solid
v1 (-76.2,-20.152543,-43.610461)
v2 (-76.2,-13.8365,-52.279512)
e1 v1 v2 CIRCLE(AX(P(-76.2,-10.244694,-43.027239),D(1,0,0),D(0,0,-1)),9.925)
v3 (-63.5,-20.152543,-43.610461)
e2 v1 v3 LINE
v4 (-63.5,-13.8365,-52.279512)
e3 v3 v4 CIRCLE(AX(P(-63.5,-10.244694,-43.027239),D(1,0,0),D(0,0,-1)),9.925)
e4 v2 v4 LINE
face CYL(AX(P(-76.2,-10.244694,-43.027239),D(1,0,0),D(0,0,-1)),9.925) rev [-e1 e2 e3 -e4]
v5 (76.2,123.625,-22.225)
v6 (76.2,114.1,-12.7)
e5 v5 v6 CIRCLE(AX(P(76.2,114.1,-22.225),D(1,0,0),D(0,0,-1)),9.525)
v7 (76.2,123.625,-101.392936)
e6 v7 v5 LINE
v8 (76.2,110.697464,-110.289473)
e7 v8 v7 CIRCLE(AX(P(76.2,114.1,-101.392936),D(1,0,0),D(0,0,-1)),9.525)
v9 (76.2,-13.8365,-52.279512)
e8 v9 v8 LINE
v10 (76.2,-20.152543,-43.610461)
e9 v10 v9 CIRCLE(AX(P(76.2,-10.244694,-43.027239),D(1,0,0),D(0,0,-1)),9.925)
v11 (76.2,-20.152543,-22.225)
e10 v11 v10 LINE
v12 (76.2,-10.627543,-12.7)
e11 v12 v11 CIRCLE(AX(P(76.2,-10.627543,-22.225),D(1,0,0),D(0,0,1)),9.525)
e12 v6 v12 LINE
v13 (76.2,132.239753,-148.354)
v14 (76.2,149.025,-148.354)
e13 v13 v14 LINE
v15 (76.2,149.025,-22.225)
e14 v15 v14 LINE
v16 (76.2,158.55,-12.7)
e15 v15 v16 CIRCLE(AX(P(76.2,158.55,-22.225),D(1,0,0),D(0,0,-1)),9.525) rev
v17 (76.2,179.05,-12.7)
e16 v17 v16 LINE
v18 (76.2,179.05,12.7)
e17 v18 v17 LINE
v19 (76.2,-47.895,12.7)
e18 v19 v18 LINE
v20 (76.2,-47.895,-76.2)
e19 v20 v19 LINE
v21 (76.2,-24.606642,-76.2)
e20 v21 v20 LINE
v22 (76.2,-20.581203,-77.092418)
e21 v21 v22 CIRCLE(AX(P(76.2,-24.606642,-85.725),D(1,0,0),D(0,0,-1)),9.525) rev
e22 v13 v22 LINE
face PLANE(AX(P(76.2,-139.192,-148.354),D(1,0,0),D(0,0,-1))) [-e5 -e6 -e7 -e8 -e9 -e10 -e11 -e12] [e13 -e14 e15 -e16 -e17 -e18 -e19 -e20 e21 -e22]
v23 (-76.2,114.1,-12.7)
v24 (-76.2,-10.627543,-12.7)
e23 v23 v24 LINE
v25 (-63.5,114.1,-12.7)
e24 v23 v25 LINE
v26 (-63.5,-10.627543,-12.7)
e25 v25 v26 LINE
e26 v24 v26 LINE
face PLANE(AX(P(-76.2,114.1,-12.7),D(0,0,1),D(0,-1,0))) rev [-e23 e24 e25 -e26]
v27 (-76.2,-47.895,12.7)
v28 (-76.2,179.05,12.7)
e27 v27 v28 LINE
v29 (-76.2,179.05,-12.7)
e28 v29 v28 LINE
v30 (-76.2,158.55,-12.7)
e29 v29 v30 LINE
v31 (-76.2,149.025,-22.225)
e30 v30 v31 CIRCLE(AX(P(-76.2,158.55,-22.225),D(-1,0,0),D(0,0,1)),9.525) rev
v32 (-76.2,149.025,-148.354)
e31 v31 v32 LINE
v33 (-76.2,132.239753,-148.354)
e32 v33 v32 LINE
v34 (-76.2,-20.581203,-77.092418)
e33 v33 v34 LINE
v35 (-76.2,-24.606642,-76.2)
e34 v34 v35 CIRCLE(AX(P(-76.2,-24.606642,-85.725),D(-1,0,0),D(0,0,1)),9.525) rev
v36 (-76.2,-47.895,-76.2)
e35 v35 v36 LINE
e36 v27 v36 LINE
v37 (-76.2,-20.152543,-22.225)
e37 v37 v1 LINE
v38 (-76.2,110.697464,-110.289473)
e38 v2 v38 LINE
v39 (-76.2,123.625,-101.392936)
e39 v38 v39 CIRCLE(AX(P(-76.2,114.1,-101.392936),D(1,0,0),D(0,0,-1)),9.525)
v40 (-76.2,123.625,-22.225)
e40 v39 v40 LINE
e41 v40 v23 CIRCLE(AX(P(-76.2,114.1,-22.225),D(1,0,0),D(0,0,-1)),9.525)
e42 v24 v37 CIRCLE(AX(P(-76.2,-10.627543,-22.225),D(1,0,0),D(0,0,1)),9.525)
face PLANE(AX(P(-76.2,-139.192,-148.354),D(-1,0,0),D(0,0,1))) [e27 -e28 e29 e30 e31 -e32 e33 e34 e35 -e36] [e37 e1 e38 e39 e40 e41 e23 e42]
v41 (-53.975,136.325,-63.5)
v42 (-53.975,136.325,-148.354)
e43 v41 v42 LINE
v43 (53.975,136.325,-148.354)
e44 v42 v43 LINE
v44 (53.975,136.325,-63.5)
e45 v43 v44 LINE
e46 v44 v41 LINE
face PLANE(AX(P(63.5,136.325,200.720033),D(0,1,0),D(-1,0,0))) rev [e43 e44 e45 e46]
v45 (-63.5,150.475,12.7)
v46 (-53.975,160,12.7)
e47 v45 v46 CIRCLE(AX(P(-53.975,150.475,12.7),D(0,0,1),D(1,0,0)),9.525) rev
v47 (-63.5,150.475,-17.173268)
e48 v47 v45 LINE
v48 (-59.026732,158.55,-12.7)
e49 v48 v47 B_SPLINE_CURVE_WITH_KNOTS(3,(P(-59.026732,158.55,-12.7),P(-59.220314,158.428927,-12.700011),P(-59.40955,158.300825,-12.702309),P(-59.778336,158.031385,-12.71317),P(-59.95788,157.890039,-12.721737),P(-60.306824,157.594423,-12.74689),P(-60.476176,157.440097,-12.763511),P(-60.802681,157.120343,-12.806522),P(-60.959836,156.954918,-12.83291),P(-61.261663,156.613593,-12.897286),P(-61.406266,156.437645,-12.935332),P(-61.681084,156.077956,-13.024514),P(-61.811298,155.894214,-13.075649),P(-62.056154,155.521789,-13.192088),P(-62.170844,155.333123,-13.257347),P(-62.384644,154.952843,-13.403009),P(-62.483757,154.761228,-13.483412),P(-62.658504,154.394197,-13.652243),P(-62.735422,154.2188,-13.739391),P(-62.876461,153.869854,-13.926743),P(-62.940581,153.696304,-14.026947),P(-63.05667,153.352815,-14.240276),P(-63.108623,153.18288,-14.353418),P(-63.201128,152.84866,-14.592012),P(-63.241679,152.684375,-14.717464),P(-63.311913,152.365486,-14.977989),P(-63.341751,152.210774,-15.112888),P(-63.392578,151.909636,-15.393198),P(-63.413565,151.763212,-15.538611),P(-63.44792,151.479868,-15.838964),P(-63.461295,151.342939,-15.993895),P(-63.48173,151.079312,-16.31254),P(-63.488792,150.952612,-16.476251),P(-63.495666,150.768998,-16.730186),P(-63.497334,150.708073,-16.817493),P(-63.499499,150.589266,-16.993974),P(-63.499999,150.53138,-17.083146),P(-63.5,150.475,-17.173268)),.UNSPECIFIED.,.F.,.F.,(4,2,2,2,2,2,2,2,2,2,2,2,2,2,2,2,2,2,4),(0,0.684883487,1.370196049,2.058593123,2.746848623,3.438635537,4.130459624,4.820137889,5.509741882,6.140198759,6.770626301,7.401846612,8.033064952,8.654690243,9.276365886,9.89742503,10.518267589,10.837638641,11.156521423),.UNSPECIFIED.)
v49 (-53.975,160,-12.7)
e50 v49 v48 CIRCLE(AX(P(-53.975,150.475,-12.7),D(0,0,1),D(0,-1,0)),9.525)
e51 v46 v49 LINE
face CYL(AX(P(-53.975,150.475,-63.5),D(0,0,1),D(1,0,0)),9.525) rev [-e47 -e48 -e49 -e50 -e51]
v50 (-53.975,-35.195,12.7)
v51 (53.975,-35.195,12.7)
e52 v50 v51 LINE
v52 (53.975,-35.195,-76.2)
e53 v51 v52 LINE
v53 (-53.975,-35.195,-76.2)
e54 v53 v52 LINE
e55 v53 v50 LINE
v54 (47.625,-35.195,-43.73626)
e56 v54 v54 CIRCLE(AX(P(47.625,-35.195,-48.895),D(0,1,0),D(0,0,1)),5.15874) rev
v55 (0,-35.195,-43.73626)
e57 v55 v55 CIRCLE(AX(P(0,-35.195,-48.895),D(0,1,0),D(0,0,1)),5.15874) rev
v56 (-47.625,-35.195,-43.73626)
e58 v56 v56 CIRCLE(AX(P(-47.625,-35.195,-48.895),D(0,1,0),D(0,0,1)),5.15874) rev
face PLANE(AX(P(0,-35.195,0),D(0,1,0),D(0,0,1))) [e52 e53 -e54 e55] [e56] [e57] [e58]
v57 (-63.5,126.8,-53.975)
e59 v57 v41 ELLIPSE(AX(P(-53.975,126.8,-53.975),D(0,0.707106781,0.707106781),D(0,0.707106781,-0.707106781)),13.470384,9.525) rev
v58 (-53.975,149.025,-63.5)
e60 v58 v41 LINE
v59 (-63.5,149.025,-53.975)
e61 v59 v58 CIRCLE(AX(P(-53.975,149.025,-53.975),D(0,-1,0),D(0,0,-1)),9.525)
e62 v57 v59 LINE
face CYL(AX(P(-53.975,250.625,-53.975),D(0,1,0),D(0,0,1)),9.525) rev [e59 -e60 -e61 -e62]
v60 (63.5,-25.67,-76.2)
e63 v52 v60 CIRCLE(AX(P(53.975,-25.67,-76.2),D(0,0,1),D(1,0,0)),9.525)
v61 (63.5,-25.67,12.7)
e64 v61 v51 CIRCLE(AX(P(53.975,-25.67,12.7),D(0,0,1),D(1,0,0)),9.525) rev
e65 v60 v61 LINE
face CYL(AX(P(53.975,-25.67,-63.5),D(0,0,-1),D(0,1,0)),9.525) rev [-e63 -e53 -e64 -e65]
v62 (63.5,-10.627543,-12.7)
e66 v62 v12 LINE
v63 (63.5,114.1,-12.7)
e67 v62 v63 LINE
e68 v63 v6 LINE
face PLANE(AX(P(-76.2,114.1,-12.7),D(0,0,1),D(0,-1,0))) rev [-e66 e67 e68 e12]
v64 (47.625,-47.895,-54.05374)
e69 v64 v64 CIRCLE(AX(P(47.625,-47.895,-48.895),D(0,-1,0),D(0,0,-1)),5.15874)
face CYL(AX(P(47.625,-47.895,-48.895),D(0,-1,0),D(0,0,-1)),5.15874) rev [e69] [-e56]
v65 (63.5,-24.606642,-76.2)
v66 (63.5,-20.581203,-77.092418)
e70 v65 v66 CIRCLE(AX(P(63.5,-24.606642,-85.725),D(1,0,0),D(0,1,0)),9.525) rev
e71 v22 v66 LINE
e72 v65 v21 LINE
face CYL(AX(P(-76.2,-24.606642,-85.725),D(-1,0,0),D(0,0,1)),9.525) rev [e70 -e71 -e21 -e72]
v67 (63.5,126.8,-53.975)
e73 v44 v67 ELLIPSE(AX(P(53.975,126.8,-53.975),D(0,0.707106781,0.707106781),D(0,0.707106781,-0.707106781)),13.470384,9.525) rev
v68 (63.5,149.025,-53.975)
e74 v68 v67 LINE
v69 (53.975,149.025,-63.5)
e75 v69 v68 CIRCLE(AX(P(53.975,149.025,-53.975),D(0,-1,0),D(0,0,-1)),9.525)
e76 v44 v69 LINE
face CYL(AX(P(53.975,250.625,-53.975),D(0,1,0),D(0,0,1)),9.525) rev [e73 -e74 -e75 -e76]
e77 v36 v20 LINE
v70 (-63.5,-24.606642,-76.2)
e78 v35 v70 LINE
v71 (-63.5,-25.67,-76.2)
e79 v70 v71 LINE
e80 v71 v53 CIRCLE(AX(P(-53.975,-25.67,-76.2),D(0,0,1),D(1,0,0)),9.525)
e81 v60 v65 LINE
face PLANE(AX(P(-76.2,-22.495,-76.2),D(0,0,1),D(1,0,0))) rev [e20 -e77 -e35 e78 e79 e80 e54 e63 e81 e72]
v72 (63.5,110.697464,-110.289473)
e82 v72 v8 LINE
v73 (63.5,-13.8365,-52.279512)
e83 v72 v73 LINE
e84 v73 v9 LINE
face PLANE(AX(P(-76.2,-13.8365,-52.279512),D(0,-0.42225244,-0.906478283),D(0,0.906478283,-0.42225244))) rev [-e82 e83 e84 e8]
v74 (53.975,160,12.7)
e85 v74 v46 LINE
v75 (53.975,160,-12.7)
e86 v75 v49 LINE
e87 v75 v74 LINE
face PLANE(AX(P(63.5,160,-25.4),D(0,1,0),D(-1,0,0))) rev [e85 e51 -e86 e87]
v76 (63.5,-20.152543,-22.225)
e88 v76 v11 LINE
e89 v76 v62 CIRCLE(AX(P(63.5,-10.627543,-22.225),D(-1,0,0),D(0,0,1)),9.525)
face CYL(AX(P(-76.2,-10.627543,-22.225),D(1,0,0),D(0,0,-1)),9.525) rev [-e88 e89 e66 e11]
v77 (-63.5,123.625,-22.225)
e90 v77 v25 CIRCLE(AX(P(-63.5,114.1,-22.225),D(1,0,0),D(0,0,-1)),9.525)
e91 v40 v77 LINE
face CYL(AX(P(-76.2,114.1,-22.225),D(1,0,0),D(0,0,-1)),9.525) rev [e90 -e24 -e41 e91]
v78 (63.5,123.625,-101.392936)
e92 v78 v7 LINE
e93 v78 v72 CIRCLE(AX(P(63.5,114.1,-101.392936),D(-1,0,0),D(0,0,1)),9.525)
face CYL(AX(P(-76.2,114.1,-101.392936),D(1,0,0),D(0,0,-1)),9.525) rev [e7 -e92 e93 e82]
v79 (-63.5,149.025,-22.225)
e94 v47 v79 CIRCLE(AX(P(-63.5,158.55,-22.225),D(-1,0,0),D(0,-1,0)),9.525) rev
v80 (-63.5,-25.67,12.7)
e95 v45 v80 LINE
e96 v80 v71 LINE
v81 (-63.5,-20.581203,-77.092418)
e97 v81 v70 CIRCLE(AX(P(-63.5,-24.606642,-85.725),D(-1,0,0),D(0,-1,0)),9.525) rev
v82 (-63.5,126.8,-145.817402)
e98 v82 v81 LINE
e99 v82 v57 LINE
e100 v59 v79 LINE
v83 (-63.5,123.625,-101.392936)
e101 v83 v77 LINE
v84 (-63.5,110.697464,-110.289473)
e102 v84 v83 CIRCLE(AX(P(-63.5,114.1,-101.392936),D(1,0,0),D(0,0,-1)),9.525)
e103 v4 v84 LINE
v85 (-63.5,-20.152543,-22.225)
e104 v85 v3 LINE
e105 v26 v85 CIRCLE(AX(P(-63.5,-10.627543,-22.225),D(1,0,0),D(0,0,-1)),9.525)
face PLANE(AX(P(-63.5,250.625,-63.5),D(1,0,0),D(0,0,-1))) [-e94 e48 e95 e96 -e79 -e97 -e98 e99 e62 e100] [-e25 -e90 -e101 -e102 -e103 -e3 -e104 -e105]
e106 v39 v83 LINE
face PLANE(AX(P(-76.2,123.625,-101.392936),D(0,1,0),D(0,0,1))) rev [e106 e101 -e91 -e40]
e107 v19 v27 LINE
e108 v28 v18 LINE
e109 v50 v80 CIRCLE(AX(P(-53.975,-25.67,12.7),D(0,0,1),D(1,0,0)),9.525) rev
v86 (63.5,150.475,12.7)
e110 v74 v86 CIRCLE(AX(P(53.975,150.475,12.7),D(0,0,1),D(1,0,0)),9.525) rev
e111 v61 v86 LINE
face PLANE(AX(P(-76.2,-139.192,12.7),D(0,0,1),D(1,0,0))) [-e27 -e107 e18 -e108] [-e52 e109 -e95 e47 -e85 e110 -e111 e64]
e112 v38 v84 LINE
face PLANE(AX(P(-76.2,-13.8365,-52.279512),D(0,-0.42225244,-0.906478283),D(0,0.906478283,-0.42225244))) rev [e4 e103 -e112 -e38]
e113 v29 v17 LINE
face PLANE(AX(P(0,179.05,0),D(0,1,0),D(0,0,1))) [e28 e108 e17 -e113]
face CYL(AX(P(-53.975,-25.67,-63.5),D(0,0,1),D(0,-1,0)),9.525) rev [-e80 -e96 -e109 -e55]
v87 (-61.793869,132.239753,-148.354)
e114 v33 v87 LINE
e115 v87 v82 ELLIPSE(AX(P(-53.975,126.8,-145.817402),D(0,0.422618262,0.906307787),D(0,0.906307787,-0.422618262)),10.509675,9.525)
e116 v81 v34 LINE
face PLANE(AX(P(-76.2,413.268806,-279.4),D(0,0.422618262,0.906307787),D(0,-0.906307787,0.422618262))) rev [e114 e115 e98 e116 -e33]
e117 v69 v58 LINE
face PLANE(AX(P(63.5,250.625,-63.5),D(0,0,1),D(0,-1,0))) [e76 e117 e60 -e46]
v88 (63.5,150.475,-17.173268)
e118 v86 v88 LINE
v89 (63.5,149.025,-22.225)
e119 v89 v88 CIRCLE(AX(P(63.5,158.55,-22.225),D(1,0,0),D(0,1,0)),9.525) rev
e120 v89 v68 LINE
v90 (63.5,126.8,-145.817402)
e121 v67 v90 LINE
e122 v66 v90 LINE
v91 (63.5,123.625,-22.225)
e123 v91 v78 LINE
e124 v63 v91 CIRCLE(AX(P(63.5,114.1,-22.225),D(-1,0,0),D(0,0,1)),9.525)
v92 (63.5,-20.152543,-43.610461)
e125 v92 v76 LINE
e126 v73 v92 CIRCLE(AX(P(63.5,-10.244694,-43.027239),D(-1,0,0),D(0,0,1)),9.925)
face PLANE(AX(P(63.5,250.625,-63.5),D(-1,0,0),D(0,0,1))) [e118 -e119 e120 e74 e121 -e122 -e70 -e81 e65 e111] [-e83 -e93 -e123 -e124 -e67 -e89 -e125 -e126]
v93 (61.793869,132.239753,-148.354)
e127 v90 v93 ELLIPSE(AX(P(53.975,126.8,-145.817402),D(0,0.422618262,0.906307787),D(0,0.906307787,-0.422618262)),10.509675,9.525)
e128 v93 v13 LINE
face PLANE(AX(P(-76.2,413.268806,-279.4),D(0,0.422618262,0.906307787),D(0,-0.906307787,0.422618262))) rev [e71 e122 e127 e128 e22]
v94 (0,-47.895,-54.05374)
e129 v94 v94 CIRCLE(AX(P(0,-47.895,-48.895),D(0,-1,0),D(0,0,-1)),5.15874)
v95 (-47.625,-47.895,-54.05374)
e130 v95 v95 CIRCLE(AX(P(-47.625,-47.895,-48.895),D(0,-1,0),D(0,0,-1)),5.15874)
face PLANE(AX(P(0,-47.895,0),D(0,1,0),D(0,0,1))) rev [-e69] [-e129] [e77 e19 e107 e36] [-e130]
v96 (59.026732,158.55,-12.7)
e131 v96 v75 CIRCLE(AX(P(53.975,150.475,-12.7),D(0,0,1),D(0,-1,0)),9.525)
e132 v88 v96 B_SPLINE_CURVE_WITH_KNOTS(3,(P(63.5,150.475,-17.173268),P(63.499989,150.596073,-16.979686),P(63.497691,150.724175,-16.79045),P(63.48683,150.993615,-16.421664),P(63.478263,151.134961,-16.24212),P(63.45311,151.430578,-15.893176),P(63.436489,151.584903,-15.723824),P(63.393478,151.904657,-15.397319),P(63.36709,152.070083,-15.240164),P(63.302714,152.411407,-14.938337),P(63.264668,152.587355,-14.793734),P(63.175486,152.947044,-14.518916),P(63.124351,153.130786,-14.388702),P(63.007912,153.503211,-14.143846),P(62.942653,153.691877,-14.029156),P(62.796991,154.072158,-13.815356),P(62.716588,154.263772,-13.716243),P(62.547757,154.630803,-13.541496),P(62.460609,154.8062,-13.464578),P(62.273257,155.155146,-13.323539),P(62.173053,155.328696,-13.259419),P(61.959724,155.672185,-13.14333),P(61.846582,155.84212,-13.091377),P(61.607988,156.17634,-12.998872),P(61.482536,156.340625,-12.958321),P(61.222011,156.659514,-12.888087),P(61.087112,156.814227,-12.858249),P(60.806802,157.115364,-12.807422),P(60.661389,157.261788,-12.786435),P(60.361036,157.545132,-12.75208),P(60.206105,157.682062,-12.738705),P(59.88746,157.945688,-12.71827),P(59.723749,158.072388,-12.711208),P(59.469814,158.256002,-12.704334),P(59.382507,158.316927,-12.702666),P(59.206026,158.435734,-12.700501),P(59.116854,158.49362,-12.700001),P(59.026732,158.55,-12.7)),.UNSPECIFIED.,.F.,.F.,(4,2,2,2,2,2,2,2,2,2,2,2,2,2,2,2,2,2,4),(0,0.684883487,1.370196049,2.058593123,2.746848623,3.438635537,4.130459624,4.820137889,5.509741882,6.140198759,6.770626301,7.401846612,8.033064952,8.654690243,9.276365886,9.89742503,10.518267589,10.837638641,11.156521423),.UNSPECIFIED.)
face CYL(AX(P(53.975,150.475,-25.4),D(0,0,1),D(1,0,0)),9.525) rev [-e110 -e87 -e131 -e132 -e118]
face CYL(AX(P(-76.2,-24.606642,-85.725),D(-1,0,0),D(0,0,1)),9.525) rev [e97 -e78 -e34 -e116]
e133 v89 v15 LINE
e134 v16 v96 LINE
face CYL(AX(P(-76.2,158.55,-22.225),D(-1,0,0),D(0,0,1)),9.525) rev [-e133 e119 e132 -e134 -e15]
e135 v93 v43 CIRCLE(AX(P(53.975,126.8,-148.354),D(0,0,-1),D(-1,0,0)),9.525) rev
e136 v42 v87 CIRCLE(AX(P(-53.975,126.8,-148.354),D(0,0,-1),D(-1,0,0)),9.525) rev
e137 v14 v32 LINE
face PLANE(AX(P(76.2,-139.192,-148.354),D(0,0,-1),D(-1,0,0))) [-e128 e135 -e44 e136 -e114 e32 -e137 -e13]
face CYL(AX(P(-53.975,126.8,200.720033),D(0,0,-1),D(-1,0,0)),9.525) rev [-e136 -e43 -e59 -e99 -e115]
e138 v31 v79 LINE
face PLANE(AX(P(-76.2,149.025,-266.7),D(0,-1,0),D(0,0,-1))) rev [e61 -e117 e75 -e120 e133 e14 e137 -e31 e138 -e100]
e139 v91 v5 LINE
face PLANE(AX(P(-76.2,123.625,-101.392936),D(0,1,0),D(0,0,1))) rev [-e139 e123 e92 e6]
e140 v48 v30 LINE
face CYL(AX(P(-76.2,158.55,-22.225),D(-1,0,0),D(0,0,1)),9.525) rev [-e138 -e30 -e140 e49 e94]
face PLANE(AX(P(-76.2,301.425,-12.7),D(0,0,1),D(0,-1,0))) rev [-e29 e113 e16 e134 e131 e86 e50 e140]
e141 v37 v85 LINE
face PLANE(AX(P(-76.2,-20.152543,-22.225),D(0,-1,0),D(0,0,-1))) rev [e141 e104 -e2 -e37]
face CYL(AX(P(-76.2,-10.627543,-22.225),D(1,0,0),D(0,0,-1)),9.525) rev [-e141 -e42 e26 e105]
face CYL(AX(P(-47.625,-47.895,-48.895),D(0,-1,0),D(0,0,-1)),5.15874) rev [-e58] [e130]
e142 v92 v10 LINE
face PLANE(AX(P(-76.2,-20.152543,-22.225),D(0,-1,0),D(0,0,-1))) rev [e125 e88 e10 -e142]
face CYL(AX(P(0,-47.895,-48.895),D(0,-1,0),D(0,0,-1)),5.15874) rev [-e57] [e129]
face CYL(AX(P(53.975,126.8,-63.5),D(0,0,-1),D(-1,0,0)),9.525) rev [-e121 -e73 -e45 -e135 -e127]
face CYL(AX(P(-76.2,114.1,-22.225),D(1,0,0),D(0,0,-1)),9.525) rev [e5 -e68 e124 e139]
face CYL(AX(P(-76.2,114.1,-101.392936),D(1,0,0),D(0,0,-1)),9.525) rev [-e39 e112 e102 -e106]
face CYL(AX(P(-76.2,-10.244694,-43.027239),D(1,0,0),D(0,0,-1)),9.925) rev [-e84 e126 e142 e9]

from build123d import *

# Parameters (mm, degrees)
BOSS_EXTRUDE1_DEPTH             = 179.04999999999998
BOSS_EXTRUDE1_DEPTH_BACK        = 139.19200000000004
BOSS_EXTRUDE2_REACH             = 246.692
BOSS_EXTRUDE2_DIRECTION_2_REACH = 246.692
F_3_8_CLEARANCE_HOLE1_D         = 10.31748
CUT_EXTRUDE1_DEPTH              = 245.69215738419686
CUT_EXTRUDE1_DEPTH_BACK         = 245.69215738419686
FILLET1_R                       = 9.525
CUT_EXTRUDE2_DEPTH              = 101.6
CUT_EXTRUDE2_DEPTH_BACK         = 184.22
FILLET2_START                   = -36
FILLET2_DEPTH                   = 185.025000106
FILLET2_START_2                 = -63.5
FILLET2_2_DEPTH                 = 9.525
FILLET2_START_3                 = 53.975
FILLET2_3_DEPTH                 = 9.525
FILLET2_START_4                 = 149.025000106
FILLET2_4_DEPTH                 = 9.525
FILLET2_5_DEPTH                 = 185.025000106
CUT_EXTRUDE3_DEPTH              = 245.69215738419686
CUT_EXTRUDE3_DEPTH_BACK         = 245.69215738419686
FILLET3_R                       = 9.525
CUT_EXTRUDE4_REACH              = 254.594
CUT_EXTRUDE5_DEPTH              = 245.6921573841969
CUT_EXTRUDE5_DEPTH_BACK         = 25.4
FILLET5_R                       = 9.525
CUT_EXTRUDE6_DEPTH              = 245.6921574759669
CUT_EXTRUDE6_DEPTH_BACK         = 245.6921574759669


with BuildPart() as part:
    # Sketch1 → Boss-Extrude1 (new, two sides: drawn at the far end of the back side and taken through both)
    with BuildSketch(Plane(origin=(0, 0, 0), x_dir=(1, 0, 0), z_dir=(0, 1, 0)).offset(-BOSS_EXTRUDE1_DEPTH_BACK)):
        Polygon((-76.20000000000003, 148.35400023367268), (-76.2000000000001, -12.7), (76.2, -12.7), (76.19999999999997, 148.35400023367268), align=None)
    extrude(amount=BOSS_EXTRUDE1_DEPTH + BOSS_EXTRUDE1_DEPTH_BACK)

    # SurfaceCut1
    split(bisect_by=Plane(origin=(-4.831e-14, -47.89499999999913, 0), x_dir=(1, -6e-17, 0), z_dir=(6e-17, 1, -1.73e-15)), keep=Keep.TOP)

    # Boss-Extrude2: up to this face of the body (flat: up to its plane)
    boss_extrude2_end = Plane(part.part.faces().sort_by_distance((76.2, 65.5775, -67.827000117))[0])
    # Sketch3 → Boss-Extrude2 (add, up to the picked face)
    with BuildSketch(Plane(origin=(0, 0, 0), x_dir=(0, 0, -1), z_dir=(1, 0, 0)), mode=Mode.PRIVATE) as boss_extrude2_sk1:
        Polygon((1.2e-16, -38.36999999999911), (75, -38.36999999999911), (75, -47.89499999999911), (1.29e-15, -47.89499999999911), align=None)
    boss_extrude2_tool1 = split(extrude(boss_extrude2_sk1.sketch, amount=BOSS_EXTRUDE2_REACH, mode=Mode.PRIVATE), bisect_by=boss_extrude2_end, keep=Keep.BOTH, mode=Mode.PRIVATE)
    add(boss_extrude2_tool1.solids().sort_by(Axis((0, -43.1325, -37.5), (1, 0, 0)))[0])

    # Boss-Extrude2 direction 2: up to this face of the body (flat: up to its plane)
    boss_extrude2_direction_2_end = Plane(part.part.faces().sort_by_distance((-76.2, 65.5775, -67.827000117))[0])
    # Sketch3 → Boss-Extrude2 direction 2 (add, up to the picked face)
    with BuildSketch(Plane(origin=(0, 0, 0), x_dir=(0, 0, -1), z_dir=(1, 0, 0)), mode=Mode.PRIVATE) as boss_extrude2_direction_2_sk1:
        Polygon((1.2e-16, -38.36999999999911), (75, -38.36999999999911), (75, -47.89499999999911), (1.29e-15, -47.89499999999911), align=None)
    boss_extrude2_direction_2_tool1 = split(extrude(boss_extrude2_direction_2_sk1.sketch, amount=-BOSS_EXTRUDE2_DIRECTION_2_REACH, mode=Mode.PRIVATE), bisect_by=boss_extrude2_direction_2_end, keep=Keep.BOTH, mode=Mode.PRIVATE)
    add(boss_extrude2_direction_2_tool1.solids().sort_by(Axis((0, -43.1325, -37.5), (-1, 0, 0)))[0])

    # 3/8 Clearance Hole1 (through all)
    with Locations(Plane.XZ.offset(47.89499999999913)):
        with Locations((47.625, -48.895), (-47.625, -48.895), (0, -48.895)):
            Hole(F_3_8_CLEARANCE_HOLE1_D / 2)

    # Sketch8 → Cut-Extrude1 (cut, two sides: drawn at the far end of the back side and taken through both)
    with BuildSketch(Plane(origin=(0, 0, 0), x_dir=(0, 0, -1), z_dir=(1, 0, 0)).offset(-CUT_EXTRUDE1_DEPTH_BACK)):
        Polygon((266.69999999999993, 301.4250001060008), (12.699999999999932, 301.42500010600077), (12.699999999999935, 149.02500010600082), (266.69999999999993, 149.02500010600085), align=None)
    extrude(amount=CUT_EXTRUDE1_DEPTH + CUT_EXTRUDE1_DEPTH_BACK, mode=Mode.SUBTRACT)

    # Fillet1
    fillet1_edges = [part.edges().sort_by_distance(p)[0] for p in [
        (-2.842e-14, 149.02500010600082, -12.699999999999935),
    ]]
    fillet(fillet1_edges, radius=FILLET1_R)

    # Sketch10 → Cut-Extrude2 (cut, two sides: drawn at the far end of the back side and taken through both)
    with BuildSketch(Plane(origin=(0, 149.02500010600082, 1.628e-14), x_dir=(1, 0, 0), z_dir=(0, 1, 1.1e-16)).offset(-CUT_EXTRUDE2_DEPTH_BACK)):
        Polygon((63.500000000000014, 63.49999999999994), (-63.500000000000014, 63.49999999999993), (-63.5, 12.699999999999932), (63.5, 12.699999999999948), align=None)
    extrude(amount=CUT_EXTRUDE2_DEPTH + CUT_EXTRUDE2_DEPTH_BACK, mode=Mode.SUBTRACT)

    # Fillet2: read off the stored shape, not the designer's step
    # Fillet2 outline → Fillet2 (add)
    with BuildSketch(Plane(origin=(0, 0, 0), x_dir=(1, 0, 0), z_dir=(0, 1, 0)).offset(FILLET2_START)):
        with BuildLine():
            Line((-63.5, 12.7), (-53.975, 12.7))
            ThreePointArc((-53.975, 12.7), (-60.710192091, 15.489807909), (-63.5, 22.225))
            Line((-63.5, 22.225), (-63.5, 12.7))
        make_face()
        with BuildLine():
            ThreePointArc((63.5, 22.225), (60.710192091, 15.489807909), (53.975, 12.7))
            Line((53.975, 12.7), (63.5, 12.7))
            Line((63.5, 12.7), (63.5, 22.225))
        make_face()
    extrude(amount=FILLET2_DEPTH)

    # Fillet2 2 outline → Fillet2 2 (add)
    with BuildSketch(Plane.YZ.offset(FILLET2_START_2)):
        with BuildLine():
            Line((149.025000106, -12.7), (149.025000106, -22.225))
            ThreePointArc((149.025000106, -22.225), (151.814808015, -15.489807909), (158.550000106, -12.7))
            Line((158.550000106, -12.7), (149.025000106, -12.7))
        make_face()
    extrude(amount=FILLET2_2_DEPTH)

    # Fillet2 3 outline → Fillet2 3 (add)
    with BuildSketch(Plane.YZ.offset(FILLET2_START_3)):
        with BuildLine():
            Line((149.025000106, -12.7), (149.025000106, -22.225))
            ThreePointArc((149.025000106, -22.225), (151.814808015, -15.489807909), (158.550000106, -12.7))
            Line((158.550000106, -12.7), (149.025000106, -12.7))
        make_face()
    extrude(amount=FILLET2_3_DEPTH)

    # Fillet2 4 outline → Fillet2 4 (cut)
    with BuildSketch(Plane(origin=(0, 0, 0), x_dir=(1, 0, 0), z_dir=(0, 1, 0)).offset(FILLET2_START_4)):
        with BuildLine():
            Line((-53.975, 22.225), (-63.5, 22.225))
            ThreePointArc((-63.5, 22.225), (-60.710192091, 15.489807909), (-53.975, 12.7))
            Line((-53.975, 12.7), (-53.975, 22.225))
        make_face()
        with BuildLine():
            ThreePointArc((53.975, 12.7), (60.710192091, 15.489807909), (63.5, 22.225))
            Line((63.5, 22.225), (53.975, 22.225))
            Line((53.975, 22.225), (53.975, 12.7))
        make_face()
    extrude(amount=FILLET2_4_DEPTH, mode=Mode.SUBTRACT)

    # Fillet2 5 outline → Fillet2 5 (add)
    with BuildSketch(Plane(origin=(0, 0, 0), x_dir=(1, 0, 0), z_dir=(0, 1, 0)).offset(FILLET2_START)):
        with BuildLine():
            ThreePointArc((53.975, 63.5), (60.710192091, 60.710192091), (63.5, 53.975))
            Line((63.5, 53.975), (63.5, 22.225))
            Line((63.5, 22.225), (76.2, 22.225))
            Line((76.2, 22.225), (76.2, 148.354000234))
            Line((76.2, 148.354000234), (-76.2, 148.354000234))
            Line((-76.2, 148.354000234), (-76.2, 22.225))
            Line((-76.2, 22.225), (-63.5, 22.225))
            Line((-63.5, 22.225), (-63.5, 53.975))
            ThreePointArc((-63.5, 53.975), (-60.710192091, 60.710192091), (-53.975, 63.5))
            Line((-53.975, 63.5), (53.975, 63.5))
        make_face()
    extrude(amount=FILLET2_5_DEPTH)

    # Sketch11 → Cut-Extrude3 (cut, two sides: drawn at the far end of the back side and taken through both)
    with BuildSketch(Plane(origin=(0, 0, 0), x_dir=(0, 0, -1), z_dir=(1, 0, 0)).offset(-CUT_EXTRUDE3_DEPTH_BACK)):
        Polygon((279.3999999999999, 413.26880624754574), (76.19999999999999, -22.494999999999397), (76.19999999999999, -78.83303235544759), (279.3999999999999, -78.83303235544756), align=None)
    extrude(amount=CUT_EXTRUDE3_DEPTH + CUT_EXTRUDE3_DEPTH_BACK, mode=Mode.SUBTRACT)

    # Fillet3
    fillet3_edges = [part.edges().sort_by_distance(p)[0] for p in [
        (-5.684e-14, -22.494999999999397, -76.19999999999999),
    ]]
    fillet(fillet3_edges, radius=FILLET3_R)

    # Cut-Extrude4: up to this face of the body (flat: up to its plane)
    cut_extrude4_end = Plane(part.part.faces().sort_by_distance((0, 75.599563928, -12.7))[0])
    # Sketch14 → Cut-Extrude4 (cut, up to the picked face)
    with BuildSketch(Plane(origin=(0, 0, -148.35400023367268), x_dir=(-1, 0, 0), z_dir=(0, 0, -1)), mode=Mode.PRIVATE) as cut_extrude4_sk1:
        Polygon((-63.5, 136.32500010600086), (63.5, 136.32500010600089), (63.50000000000004, -35.19499999999937), (-63.499999999999986, -35.19499999999938), align=None)
    cut_extrude4_tool1 = split(extrude(cut_extrude4_sk1.sketch, amount=-CUT_EXTRUDE4_REACH, mode=Mode.PRIVATE), bisect_by=cut_extrude4_end, keep=Keep.BOTH, mode=Mode.PRIVATE)
    add(cut_extrude4_tool1.solids().sort_by(Axis((0, 50.565, -148.354), (0, 0, 1)))[0], mode=Mode.SUBTRACT)

    # Sketch15 → Cut-Extrude5 (cut, two sides: drawn at the far end of the back side and taken through both)
    with BuildSketch(Plane.XY.offset(-CUT_EXTRUDE5_DEPTH_BACK)):
        Polygon((63.5, 159.99999999999997), (-63.5, 159.99999999999994), (-63.500000000000014, -35.194999999999425), (63.50000000000007, -35.19499999999941), align=None)
    extrude(amount=CUT_EXTRUDE5_DEPTH + CUT_EXTRUDE5_DEPTH_BACK, mode=Mode.SUBTRACT)

    # Fillet5
    fillet5_edges = [part.edges().sort_by_distance(p)[0] for p in [
        (63.5, 159.99999999999997, 2.842e-14),
        (-63.5, 159.99999999999994, 2.842e-14),
        (-63.5, 136.32500010600089, -101.16450011683634),
        (63.5, 136.32500010600086, -101.16450011683634),
        (63.5, -35.19499989399918, -38.1),
        (-63.5, -35.19499989399918, -38.1),
    ]]
    fillet(fillet5_edges, radius=FILLET5_R)

    # Sketch16 → Cut-Extrude6 (cut, two sides: drawn at the far end of the back side and taken through both)
    with BuildSketch(Plane(origin=(0, 0, 0), x_dir=(0, 0, -1), z_dir=(1, 0, 0)).offset(-CUT_EXTRUDE6_DEPTH_BACK)):
        with BuildLine():
            Line((22.225, -20.152543088136632), (43.61046140315716, -20.152543088136635))
            ThreePointArc((43.61046140315716, -20.152543088136635), (48.871667611787636, -18.266432044059904), (52.27951237608929, -13.836499798218902))
            Line((52.27951237608929, -13.836499798218902), (110.28947349119366, 110.6974636611936))
            ThreePointArc((110.28947349119366, 110.6974636611936), (109.2394256542931, 119.49983646292918), (101.39293648279772, 123.62500010600078))
            Line((101.39293648279772, 123.62500010600078), (22.225000000000072, 123.6250001060008))
            ThreePointArc((22.225000000000072, 123.6250001060008), (15.489807909198145, 120.83519219680267), (12.700000000000001, 114.10000010600075))
            Line((12.700000000000001, 114.10000010600075), (12.7, -10.627543088136633))
            ThreePointArc((12.7, -10.627543088136633), (15.489807909198138, -17.362735178938497), (22.225, -20.152543088136632))
        make_face()
    extrude(amount=CUT_EXTRUDE6_DEPTH + CUT_EXTRUDE6_DEPTH_BACK, mode=Mode.SUBTRACT)


solid = part.part
